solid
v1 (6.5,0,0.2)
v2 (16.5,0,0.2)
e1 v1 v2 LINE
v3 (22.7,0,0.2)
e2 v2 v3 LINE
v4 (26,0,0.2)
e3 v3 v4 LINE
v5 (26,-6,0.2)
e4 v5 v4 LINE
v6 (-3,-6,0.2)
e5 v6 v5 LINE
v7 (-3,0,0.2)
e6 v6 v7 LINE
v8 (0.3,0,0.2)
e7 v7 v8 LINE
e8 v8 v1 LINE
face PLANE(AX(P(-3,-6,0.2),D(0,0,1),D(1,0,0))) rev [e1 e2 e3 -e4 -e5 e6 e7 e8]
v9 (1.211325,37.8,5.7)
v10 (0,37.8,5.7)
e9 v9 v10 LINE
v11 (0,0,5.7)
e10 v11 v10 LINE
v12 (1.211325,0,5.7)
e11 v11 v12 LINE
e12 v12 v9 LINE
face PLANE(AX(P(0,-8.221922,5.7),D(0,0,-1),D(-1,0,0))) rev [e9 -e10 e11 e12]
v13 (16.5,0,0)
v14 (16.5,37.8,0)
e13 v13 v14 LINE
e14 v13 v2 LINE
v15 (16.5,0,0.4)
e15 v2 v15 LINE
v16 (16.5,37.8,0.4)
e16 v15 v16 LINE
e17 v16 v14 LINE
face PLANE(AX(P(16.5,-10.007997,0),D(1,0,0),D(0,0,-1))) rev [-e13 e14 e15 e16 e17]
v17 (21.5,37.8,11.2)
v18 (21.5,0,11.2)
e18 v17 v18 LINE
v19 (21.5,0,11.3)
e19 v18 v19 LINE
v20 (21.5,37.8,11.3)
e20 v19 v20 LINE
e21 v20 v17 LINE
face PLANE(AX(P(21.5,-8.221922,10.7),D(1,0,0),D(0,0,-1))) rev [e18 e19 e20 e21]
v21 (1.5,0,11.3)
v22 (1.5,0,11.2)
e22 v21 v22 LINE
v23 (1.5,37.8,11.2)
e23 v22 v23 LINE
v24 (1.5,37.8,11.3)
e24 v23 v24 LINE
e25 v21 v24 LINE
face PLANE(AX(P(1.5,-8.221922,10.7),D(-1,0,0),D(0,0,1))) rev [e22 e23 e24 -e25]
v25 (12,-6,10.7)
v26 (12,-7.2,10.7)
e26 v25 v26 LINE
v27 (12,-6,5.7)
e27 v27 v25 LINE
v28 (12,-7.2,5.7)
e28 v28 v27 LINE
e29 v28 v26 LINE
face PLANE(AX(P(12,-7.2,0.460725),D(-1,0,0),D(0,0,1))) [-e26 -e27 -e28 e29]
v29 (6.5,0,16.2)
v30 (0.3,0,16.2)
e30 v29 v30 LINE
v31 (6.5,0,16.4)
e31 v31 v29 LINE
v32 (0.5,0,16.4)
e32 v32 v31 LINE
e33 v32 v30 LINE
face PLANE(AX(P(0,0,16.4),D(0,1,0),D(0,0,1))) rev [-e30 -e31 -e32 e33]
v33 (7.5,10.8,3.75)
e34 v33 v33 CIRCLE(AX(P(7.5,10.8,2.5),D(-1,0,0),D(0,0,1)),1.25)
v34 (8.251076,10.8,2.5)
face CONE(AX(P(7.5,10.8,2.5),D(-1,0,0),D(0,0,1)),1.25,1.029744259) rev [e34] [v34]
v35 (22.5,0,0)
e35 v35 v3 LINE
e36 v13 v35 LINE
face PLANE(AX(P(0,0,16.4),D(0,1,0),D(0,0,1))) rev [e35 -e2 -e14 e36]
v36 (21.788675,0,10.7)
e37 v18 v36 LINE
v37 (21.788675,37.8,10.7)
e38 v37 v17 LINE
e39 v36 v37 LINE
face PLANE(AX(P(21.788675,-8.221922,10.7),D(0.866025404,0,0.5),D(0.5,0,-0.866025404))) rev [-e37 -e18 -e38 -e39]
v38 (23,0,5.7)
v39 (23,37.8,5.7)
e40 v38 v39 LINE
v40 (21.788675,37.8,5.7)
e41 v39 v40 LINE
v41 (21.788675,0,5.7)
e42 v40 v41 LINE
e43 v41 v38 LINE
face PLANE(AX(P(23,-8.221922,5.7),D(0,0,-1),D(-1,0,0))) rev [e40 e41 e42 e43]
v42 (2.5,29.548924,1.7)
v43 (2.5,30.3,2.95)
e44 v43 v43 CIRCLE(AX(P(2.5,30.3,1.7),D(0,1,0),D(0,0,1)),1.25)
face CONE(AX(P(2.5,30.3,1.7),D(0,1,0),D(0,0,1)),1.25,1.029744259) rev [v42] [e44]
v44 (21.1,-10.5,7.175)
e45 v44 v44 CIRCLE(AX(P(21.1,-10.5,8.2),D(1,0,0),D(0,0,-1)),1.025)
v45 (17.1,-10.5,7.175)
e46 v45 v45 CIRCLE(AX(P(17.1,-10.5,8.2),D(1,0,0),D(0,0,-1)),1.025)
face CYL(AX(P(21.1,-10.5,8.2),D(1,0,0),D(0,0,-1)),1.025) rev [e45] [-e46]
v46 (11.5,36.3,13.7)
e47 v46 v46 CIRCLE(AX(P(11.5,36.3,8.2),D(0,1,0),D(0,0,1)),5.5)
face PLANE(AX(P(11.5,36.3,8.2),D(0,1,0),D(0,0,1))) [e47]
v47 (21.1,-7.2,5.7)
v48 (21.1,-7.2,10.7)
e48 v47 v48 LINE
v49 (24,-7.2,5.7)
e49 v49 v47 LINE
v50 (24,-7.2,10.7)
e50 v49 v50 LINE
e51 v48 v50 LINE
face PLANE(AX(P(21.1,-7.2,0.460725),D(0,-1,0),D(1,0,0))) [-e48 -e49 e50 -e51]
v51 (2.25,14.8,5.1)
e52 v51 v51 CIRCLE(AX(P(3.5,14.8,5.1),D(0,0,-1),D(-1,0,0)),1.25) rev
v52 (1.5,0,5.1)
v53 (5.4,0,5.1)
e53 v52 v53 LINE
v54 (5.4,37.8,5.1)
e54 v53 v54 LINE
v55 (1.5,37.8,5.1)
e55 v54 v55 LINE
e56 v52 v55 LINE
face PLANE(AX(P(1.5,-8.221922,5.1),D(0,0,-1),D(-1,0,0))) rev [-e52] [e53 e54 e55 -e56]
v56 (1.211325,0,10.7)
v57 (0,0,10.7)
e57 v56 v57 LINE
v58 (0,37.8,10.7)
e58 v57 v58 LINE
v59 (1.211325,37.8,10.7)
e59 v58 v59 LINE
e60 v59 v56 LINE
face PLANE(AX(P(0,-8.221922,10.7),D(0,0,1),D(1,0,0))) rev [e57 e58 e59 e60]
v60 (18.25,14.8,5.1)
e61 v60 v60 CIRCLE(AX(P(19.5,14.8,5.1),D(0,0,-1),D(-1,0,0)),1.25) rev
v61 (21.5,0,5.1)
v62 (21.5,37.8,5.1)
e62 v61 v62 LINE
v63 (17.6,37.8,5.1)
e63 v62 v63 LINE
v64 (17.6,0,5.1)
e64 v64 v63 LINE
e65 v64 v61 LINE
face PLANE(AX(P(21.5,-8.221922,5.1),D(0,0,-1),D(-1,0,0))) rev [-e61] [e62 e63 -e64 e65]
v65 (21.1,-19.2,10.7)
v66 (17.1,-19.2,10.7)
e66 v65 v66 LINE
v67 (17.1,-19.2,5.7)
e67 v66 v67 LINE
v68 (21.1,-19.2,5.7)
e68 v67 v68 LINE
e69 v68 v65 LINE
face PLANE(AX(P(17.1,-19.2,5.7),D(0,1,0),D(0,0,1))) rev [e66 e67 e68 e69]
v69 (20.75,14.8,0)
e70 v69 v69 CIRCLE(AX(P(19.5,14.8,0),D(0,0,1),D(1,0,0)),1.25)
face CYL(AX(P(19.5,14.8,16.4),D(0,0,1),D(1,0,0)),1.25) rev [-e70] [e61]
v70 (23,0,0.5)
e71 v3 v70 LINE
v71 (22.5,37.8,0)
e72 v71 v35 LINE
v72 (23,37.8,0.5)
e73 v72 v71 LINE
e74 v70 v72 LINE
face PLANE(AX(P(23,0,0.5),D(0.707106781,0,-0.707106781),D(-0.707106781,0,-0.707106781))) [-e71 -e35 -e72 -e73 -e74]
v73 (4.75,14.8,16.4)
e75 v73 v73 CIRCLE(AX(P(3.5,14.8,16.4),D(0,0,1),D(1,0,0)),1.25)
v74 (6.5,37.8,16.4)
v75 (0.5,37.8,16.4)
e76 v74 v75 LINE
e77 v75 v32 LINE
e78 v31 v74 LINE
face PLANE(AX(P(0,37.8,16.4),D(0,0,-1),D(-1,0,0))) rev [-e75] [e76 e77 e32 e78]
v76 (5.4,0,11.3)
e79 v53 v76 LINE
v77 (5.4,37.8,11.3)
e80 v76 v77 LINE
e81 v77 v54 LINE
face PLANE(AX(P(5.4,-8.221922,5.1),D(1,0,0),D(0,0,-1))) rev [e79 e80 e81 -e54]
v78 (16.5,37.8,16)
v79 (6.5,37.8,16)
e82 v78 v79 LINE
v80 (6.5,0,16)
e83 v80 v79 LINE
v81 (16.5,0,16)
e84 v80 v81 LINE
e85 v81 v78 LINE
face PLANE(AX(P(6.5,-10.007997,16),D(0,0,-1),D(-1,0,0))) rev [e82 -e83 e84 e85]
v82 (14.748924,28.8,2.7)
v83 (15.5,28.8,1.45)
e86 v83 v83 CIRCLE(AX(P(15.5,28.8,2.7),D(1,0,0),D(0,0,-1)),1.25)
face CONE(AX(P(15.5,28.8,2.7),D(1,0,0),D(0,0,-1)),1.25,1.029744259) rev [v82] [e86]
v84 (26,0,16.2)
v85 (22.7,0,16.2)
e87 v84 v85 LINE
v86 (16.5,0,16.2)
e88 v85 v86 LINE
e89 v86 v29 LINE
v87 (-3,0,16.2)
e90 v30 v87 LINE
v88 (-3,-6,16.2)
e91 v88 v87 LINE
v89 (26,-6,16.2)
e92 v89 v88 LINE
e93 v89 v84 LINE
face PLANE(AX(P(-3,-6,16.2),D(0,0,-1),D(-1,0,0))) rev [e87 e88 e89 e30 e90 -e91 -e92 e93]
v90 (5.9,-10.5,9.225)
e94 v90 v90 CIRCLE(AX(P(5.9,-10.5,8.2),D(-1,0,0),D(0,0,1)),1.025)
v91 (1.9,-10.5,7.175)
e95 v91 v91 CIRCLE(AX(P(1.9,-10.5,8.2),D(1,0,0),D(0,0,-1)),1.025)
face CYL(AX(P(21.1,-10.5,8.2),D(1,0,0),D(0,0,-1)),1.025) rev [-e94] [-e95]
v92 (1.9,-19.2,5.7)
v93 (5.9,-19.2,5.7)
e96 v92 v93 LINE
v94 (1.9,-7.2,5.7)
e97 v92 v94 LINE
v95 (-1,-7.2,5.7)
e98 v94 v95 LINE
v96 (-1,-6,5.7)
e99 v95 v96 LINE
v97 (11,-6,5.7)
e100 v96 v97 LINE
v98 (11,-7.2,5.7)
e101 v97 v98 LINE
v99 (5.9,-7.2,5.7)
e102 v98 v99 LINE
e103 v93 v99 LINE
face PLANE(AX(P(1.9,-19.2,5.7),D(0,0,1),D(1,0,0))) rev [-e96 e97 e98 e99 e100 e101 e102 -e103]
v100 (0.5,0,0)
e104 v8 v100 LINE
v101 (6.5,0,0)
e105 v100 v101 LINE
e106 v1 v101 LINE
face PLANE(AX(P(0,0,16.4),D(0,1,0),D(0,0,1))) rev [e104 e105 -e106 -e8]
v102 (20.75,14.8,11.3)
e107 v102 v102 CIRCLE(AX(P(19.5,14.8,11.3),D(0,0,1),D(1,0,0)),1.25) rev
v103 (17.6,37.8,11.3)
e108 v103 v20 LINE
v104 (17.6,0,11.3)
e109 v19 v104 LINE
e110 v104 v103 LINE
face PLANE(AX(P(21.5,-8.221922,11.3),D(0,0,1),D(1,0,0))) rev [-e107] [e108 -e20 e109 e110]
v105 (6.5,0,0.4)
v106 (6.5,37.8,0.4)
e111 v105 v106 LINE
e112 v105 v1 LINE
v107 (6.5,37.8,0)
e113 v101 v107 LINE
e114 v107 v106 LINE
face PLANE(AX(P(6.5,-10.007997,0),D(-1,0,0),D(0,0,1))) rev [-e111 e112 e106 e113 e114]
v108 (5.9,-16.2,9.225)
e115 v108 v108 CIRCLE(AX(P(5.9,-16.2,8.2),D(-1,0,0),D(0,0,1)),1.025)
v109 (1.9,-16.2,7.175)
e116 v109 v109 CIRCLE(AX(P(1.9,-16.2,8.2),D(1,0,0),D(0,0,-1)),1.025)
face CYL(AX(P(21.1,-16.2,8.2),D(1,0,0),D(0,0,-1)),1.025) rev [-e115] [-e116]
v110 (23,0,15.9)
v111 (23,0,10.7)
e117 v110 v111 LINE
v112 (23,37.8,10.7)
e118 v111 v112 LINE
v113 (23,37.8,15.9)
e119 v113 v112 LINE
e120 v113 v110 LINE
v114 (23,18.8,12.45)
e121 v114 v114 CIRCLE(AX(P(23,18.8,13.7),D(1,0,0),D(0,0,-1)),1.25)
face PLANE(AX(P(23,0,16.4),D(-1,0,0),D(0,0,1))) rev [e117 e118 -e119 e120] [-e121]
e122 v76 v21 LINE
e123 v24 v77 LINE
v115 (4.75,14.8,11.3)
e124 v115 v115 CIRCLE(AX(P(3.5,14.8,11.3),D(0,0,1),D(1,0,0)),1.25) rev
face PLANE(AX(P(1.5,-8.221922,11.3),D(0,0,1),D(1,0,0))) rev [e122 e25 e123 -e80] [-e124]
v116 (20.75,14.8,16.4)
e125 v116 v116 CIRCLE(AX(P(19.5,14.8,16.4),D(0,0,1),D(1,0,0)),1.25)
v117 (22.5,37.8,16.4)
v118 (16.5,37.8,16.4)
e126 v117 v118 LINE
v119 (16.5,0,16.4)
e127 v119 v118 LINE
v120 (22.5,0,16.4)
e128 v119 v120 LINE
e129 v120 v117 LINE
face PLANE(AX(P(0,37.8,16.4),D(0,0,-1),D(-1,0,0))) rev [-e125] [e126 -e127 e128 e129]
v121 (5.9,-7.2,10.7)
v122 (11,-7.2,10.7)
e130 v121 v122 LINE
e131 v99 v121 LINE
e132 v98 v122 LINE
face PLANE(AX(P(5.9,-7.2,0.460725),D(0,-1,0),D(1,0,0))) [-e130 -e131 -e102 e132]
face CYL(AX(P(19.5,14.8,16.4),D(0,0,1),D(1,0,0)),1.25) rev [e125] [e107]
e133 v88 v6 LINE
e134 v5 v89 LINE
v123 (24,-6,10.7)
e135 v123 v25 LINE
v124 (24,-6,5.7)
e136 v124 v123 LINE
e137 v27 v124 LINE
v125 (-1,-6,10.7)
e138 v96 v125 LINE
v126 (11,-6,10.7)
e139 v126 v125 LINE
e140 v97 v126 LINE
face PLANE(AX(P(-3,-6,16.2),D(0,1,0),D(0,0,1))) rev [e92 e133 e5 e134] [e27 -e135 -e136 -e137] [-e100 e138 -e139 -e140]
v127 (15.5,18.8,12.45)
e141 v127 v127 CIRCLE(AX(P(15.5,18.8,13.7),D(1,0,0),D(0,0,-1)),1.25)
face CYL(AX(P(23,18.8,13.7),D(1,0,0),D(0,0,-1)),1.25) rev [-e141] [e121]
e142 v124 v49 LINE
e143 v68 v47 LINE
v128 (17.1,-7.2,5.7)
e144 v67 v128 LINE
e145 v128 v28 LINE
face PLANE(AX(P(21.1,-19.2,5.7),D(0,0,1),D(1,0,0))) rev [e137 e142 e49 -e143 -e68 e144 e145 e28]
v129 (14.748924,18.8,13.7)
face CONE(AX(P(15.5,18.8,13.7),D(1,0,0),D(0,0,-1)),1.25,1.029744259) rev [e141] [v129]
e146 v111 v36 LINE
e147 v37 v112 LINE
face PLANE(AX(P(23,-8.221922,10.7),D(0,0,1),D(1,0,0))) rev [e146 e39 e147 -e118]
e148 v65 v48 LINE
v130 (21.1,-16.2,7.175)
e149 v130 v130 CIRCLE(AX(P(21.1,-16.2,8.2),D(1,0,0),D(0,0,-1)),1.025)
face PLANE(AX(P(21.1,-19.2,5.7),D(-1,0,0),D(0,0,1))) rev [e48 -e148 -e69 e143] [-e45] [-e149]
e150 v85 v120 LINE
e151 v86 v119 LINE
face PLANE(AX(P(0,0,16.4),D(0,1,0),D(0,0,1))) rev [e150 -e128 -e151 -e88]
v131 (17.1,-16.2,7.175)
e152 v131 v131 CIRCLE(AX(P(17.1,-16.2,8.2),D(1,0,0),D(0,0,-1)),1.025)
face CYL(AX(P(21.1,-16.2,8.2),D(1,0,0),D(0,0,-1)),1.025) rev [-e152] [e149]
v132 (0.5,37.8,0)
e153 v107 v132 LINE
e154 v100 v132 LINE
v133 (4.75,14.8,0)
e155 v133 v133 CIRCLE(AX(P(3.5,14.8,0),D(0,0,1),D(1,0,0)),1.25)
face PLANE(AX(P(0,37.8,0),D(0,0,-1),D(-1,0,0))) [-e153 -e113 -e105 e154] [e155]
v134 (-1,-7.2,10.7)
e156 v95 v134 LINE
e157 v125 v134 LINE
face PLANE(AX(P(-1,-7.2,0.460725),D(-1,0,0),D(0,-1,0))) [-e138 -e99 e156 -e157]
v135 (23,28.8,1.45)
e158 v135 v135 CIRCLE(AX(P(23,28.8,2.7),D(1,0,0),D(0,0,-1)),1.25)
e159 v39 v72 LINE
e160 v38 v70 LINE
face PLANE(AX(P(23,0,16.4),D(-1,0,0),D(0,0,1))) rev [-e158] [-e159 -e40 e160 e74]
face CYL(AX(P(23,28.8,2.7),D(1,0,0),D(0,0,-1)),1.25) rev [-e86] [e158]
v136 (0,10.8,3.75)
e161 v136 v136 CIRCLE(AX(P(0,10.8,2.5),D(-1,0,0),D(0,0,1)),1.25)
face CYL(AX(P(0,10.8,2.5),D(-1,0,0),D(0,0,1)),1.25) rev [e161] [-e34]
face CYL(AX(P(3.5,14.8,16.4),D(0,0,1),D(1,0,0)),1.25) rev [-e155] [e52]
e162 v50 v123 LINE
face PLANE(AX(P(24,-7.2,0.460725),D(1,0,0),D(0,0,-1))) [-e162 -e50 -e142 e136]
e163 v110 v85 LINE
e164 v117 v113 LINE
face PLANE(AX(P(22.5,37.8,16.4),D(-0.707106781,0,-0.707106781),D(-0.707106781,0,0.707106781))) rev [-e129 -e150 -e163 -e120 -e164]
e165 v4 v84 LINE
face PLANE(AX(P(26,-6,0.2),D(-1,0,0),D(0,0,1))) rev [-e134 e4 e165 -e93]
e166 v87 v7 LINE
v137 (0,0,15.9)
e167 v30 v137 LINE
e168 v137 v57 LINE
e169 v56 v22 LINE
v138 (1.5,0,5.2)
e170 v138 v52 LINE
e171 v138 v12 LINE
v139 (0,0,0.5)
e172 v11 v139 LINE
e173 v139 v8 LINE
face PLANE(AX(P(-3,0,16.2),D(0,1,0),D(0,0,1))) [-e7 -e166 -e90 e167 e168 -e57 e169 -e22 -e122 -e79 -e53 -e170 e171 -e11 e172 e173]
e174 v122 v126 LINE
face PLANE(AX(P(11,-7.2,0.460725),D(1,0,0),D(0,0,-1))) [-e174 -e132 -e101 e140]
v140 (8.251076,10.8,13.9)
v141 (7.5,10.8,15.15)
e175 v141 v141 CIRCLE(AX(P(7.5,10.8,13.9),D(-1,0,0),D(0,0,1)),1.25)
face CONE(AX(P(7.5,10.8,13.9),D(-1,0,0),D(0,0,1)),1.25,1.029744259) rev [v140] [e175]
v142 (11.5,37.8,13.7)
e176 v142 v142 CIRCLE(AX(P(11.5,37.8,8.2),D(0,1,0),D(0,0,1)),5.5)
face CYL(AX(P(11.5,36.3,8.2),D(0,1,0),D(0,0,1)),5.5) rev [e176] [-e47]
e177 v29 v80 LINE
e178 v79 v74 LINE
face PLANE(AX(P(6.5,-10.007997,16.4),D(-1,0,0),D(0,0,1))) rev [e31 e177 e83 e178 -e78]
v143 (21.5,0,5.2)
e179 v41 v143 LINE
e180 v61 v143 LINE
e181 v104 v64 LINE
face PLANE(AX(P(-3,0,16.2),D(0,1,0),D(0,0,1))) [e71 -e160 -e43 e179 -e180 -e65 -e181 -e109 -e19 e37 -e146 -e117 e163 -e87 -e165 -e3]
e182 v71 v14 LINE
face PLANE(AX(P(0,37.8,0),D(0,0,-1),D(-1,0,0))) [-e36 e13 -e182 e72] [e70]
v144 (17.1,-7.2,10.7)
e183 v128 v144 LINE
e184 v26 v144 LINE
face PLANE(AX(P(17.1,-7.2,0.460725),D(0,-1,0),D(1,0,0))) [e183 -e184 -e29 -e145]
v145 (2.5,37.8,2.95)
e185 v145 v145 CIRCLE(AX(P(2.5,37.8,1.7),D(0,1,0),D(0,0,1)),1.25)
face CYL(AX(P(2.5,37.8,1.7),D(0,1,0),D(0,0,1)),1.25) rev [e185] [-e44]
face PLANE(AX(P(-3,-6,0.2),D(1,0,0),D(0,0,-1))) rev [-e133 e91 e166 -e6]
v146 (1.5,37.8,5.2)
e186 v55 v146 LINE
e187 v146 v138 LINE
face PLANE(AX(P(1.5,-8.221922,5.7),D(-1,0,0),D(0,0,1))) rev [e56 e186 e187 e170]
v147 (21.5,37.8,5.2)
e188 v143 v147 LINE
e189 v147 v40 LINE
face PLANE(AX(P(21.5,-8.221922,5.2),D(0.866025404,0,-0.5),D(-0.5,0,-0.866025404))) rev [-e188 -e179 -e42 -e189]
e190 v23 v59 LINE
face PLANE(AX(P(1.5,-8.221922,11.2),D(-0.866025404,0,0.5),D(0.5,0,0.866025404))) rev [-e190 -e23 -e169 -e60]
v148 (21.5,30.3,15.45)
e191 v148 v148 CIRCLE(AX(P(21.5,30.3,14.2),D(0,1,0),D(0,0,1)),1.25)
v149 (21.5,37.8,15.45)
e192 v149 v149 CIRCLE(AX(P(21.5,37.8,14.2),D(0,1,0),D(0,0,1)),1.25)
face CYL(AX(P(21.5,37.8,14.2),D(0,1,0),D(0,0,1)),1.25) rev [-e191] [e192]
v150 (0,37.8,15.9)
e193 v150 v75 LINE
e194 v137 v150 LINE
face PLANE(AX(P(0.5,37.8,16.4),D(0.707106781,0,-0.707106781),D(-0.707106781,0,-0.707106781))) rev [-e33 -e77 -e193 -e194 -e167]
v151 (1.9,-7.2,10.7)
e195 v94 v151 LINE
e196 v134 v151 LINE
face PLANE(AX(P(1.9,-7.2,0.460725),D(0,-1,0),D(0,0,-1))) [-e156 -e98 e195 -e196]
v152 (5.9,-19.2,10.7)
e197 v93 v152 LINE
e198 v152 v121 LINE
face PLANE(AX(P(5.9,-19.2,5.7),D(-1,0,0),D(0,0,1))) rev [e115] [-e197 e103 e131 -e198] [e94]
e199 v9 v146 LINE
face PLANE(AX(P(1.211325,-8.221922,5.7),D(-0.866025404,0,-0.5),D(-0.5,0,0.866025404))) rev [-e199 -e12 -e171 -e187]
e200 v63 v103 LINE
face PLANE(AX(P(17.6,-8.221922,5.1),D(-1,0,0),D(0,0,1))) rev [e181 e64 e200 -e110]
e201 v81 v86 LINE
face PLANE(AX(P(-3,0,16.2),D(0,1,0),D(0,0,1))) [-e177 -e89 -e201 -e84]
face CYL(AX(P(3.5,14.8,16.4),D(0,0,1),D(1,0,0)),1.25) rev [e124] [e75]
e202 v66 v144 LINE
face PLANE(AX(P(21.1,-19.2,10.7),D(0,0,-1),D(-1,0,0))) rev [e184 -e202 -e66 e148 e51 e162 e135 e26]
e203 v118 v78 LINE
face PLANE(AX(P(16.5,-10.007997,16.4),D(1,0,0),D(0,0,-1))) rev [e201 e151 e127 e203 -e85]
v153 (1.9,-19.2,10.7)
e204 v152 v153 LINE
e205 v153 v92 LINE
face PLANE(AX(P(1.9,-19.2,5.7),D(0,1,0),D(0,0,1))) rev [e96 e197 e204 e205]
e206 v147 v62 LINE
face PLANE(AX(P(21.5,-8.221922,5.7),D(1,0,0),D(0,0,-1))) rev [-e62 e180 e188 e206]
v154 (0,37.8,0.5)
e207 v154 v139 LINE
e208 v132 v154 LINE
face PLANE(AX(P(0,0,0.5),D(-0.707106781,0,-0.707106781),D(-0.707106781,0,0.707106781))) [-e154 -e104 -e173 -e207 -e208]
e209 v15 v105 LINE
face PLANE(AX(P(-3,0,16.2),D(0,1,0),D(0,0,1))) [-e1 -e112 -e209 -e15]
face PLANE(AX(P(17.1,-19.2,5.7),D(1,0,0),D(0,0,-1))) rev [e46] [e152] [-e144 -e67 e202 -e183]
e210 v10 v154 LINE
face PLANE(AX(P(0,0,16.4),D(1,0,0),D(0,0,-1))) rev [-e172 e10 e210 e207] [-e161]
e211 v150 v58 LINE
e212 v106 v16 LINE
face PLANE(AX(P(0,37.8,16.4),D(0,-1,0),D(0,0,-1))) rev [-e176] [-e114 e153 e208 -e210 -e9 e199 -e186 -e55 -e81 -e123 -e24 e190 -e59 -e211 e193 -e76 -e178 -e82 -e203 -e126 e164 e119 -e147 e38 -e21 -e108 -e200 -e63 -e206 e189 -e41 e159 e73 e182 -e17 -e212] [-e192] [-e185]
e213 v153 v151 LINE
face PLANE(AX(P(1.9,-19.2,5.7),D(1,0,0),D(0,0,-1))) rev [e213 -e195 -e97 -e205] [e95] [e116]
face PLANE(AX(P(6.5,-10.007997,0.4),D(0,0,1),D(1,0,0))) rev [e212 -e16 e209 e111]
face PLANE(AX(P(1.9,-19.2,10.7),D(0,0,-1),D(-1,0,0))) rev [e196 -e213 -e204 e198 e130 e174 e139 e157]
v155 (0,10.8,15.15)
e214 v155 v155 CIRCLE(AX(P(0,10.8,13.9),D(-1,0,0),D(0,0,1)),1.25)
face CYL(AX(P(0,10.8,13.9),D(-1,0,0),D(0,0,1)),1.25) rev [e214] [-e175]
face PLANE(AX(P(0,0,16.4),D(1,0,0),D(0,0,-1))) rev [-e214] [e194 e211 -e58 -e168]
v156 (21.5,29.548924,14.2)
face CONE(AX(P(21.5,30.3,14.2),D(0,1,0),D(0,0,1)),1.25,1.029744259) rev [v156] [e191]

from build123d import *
from OCP.BRepFilletAPI import BRepFilletAPI_MakeChamfer

# Parameters (mm, degrees)
SKETCH_1_W             = 23
SKETCH_1_H             = 37.8
EXTRUDE_1_DEPTH        = 16.4
SKETCH_19_W            = 29
SKETCH_19_H            = 16
EXTRUDE_3_DEPTH        = 6
SKETCH_5_W             = 4
SKETCH_5_H             = 5
EXTRUDE_2_DEPTH        = 13.2
SKETCH_20_W            = 2.9
SKETCH_20_H            = 1.2
SKETCH_20_W_2          = 5.1
EXTRUDE_4_DEPTH        = 5
HOLE_WIZARD_M2_5_1_D   = 2.05
HOLE_WIZARD_M3_6_D     = 2.5
HOLE_WIZARD_M3_6_DEPTH = 7.5
HOLE_WIZARD_M3_6_TIP   = 0.751075774
HOLE_WIZARD_M3_7_D     = 2.5
HOLE_WIZARD_M3_7_DEPTH = 7.5
HOLE_WIZARD_M3_7_TIP   = 0.751075774
HOLE_WIZARD_M3_5_D     = 2.5
SKETCH_15_R            = 5.5
CUT_EXTRUDE_4_DEPTH    = 1.5
HOLE_WIZARD_M3_4_D     = 2.5
HOLE_WIZARD_M3_4_DEPTH = 7.5
HOLE_WIZARD_M3_4_TIP   = 0.751075774
CUT_EXTRUDE_5_REACH    = 66.761
CHAMFER_1_SIZE         = 0.5
CHAMFER_1_SIZE2        = 0.288675135
CHAMFER_2_SIZE         = 0.5
CHAMFER_2_SIZE2        = 0.288675135
SKETCH_25_W            = 10
SKETCH_25_H            = 0.4
CUT_EXTRUDE_6_DEPTH    = 37.8
CHAMFER_3_SIZE         = 0.5


with BuildPart() as part:
    # 草图1 → 拉伸1 (new body)
    with BuildSketch(Plane.XY):
        with Locations((11.5, 18.9)):
            Rectangle(SKETCH_1_W, SKETCH_1_H)
    extrude(amount=EXTRUDE_1_DEPTH)

    # 草图19 → 拉伸3 (add)
    with BuildSketch(Plane.XZ):
        with Locations((11.5, 8.2)):
            Rectangle(SKETCH_19_W, SKETCH_19_H)
    extrude(amount=EXTRUDE_3_DEPTH)

    # 草图5 → 拉伸2 (add)
    with BuildSketch(Plane.XZ.offset(6)):
        with Locations((3.9, 8.2)):
            Rectangle(SKETCH_5_W, SKETCH_5_H)
        with Locations((19.1, 8.2)):
            Rectangle(SKETCH_5_W, SKETCH_5_H)
    extrude(amount=EXTRUDE_2_DEPTH)

    # 草图20 → 拉伸4 (add)
    with BuildSketch(Plane.XY.offset(10.7)):
        with Locations((0.45, -6.6)):
            Rectangle(SKETCH_20_W, SKETCH_20_H)
        with Locations((8.45, -6.6)):
            Rectangle(SKETCH_20_W_2, SKETCH_20_H)
        with Locations((14.55, -6.6)):
            Rectangle(SKETCH_20_W_2, SKETCH_20_H)
        with Locations((22.55, -6.6)):
            Rectangle(SKETCH_20_W, SKETCH_20_H)
    extrude(amount=-EXTRUDE_4_DEPTH)

    # M2.5 螺纹孔1 (through all)
    with Locations(Plane(origin=(21.1, 0, 0), x_dir=(0, 0, -1), z_dir=(1, 0, 0))):
        with Locations((-8.2, -16.2), (-8.2, -10.5)):
            Hole(HOLE_WIZARD_M2_5_1_D / 2)

    # M3 螺纹孔6
    with Locations(Plane(origin=(23, 0, 0), x_dir=(0, 0, -1), z_dir=(1, 0, 0))):
        with Locations((-2.7, 28.8), (-13.7, 18.8)):
            Hole(HOLE_WIZARD_M3_6_D / 2, depth=HOLE_WIZARD_M3_6_DEPTH)
            with Locations((0, 0, -(HOLE_WIZARD_M3_6_DEPTH + HOLE_WIZARD_M3_6_TIP / 2))):  # 118° drill point
                Cone(0, HOLE_WIZARD_M3_6_D / 2, HOLE_WIZARD_M3_6_TIP, mode=Mode.SUBTRACT)

    # M3 螺纹孔7
    with Locations(Plane.ZY):
        with Locations((2.5, 10.8), (13.9, 10.8)):
            Hole(HOLE_WIZARD_M3_7_D / 2, depth=HOLE_WIZARD_M3_7_DEPTH)
            with Locations((0, 0, -(HOLE_WIZARD_M3_7_DEPTH + HOLE_WIZARD_M3_7_TIP / 2))):  # 118° drill point
                Cone(0, HOLE_WIZARD_M3_7_D / 2, HOLE_WIZARD_M3_7_TIP, mode=Mode.SUBTRACT)

    # M3 螺纹孔5 (through all)
    with Locations(Plane.XY.offset(16.4)):
        with Locations((3.5, 14.8), (19.5, 14.8)):
            Hole(HOLE_WIZARD_M3_5_D / 2)

    # 草图15 → 切除-拉伸4 (cut)
    with BuildSketch(Plane(origin=(0, 37.8, 0), x_dir=(1, 0, 0), z_dir=(0, 1, 0))):
        with Locations(Location((11.5, -8.2, 0), (0, 0, 270))):
            Circle(SKETCH_15_R)
    extrude(amount=-CUT_EXTRUDE_4_DEPTH, mode=Mode.SUBTRACT)

    # M3 螺纹孔4
    with Locations(Plane(origin=(0, 37.8, 0), x_dir=(-1, 0, 0), z_dir=(0, 1, 0))):
        with Locations((-2.5, 1.7), (-21.5, 14.2)):
            Hole(HOLE_WIZARD_M3_4_D / 2, depth=HOLE_WIZARD_M3_4_DEPTH)
            with Locations((0, 0, -(HOLE_WIZARD_M3_4_DEPTH + HOLE_WIZARD_M3_4_TIP / 2))):  # 118° drill point
                Cone(0, HOLE_WIZARD_M3_4_D / 2, HOLE_WIZARD_M3_4_TIP, mode=Mode.SUBTRACT)

    # 切除-拉伸5: up to this face of the body (flat: up to its plane)
    cut_extrude_5_end = Plane(part.part.faces().sort_by_distance((-1.5, 0, 8.2))[0])
    # 草图18 → 切除-拉伸5 (cut, up to the picked face)
    with BuildSketch(Plane(origin=(0, 37.8, 0), x_dir=(1, 0, 0), z_dir=(0, 1, 0)), mode=Mode.PRIVATE) as cut_extrude_5_sk1:
        Polygon((23, -10.7), (23, -5.7), (21.5, -5.7), (21.5, -5.1), (17.6, -5.1), (17.6, -11.3), (21.5, -11.3), (21.5, -10.7), align=None)
    cut_extrude_5_tool1 = split(extrude(cut_extrude_5_sk1.sketch, amount=-CUT_EXTRUDE_5_REACH, mode=Mode.PRIVATE), bisect_by=cut_extrude_5_end, keep=Keep.BOTH, mode=Mode.PRIVATE)
    # 草图18 → 切除-拉伸5 (cut, up to the picked face)
    with BuildSketch(Plane(origin=(0, 37.8, 0), x_dir=(1, 0, 0), z_dir=(0, 1, 0)), mode=Mode.PRIVATE) as cut_extrude_5_sk2:
        Polygon((0, -10.7), (1.5, -10.7), (1.5, -11.3), (5.4, -11.3), (5.4, -5.1), (1.5, -5.1), (1.5, -5.7), (0, -5.7), align=None)
    cut_extrude_5_tool2 = split(extrude(cut_extrude_5_sk2.sketch, amount=-CUT_EXTRUDE_5_REACH, mode=Mode.PRIVATE), bisect_by=cut_extrude_5_end, keep=Keep.BOTH, mode=Mode.PRIVATE)
    add(cut_extrude_5_tool1.solids().sort_by(Axis((20.189205, 37.8, 8.2), (0, -1, 0)))[0], mode=Mode.SUBTRACT)
    add(cut_extrude_5_tool2.solids().sort_by(Axis((2.810795, 37.8, 8.2), (0, -1, 0)))[0], mode=Mode.SUBTRACT)

    # 倒角1: one chamfer whose edges measure the first distance from different faces: ONE call of the kernel's chamfer builder (chamfer() names one face for all edges)
    chamfer_1_edges_1 = [part.edges().sort_by_distance(p)[0] for p in [
        (21.5, 18.9, 10.7),
    ]]
    chamfer_1_side_1 = [part.faces().sort_by_distance(p)[0] for p in [
        (21.5, 18.9, 11),
    ]]
    chamfer_1_edges_2 = [part.edges().sort_by_distance(p)[0] for p in [
        (1.5, 18.9, 5.7),
    ]]
    chamfer_1_side_2 = [part.faces().sort_by_distance(p)[0] for p in [
        (1.5, 18.9, 5.4),
    ]]
    chamfer_1 = BRepFilletAPI_MakeChamfer(part.part.solid().wrapped)
    for e in chamfer_1_edges_1:
        chamfer_1.Add(CHAMFER_1_SIZE, CHAMFER_1_SIZE2, e.wrapped, chamfer_1_side_1[0].wrapped)  # the first distance lies on this face
    for e in chamfer_1_edges_2:
        chamfer_1.Add(CHAMFER_1_SIZE, CHAMFER_1_SIZE2, e.wrapped, chamfer_1_side_2[0].wrapped)  # the first distance lies on this face
    add(Compound.cast(chamfer_1.Shape()), mode=Mode.REPLACE)

    # 倒角2: one chamfer whose edges measure the first distance from different faces: ONE call of the kernel's chamfer builder (chamfer() names one face for all edges)
    chamfer_2_edges_1 = [part.edges().sort_by_distance(p)[0] for p in [
        (21.5, 18.9, 5.7),
    ]]
    chamfer_2_side_1 = [part.faces().sort_by_distance(p)[0] for p in [
        (21.5, 18.9, 5.4),
    ]]
    chamfer_2_edges_2 = [part.edges().sort_by_distance(p)[0] for p in [
        (1.5, 18.9, 10.7),
    ]]
    chamfer_2_side_2 = [part.faces().sort_by_distance(p)[0] for p in [
        (1.5, 18.9, 11),
    ]]
    chamfer_2 = BRepFilletAPI_MakeChamfer(part.part.solid().wrapped)
    for e in chamfer_2_edges_1:
        chamfer_2.Add(CHAMFER_2_SIZE, CHAMFER_2_SIZE2, e.wrapped, chamfer_2_side_1[0].wrapped)  # the first distance lies on this face
    for e in chamfer_2_edges_2:
        chamfer_2.Add(CHAMFER_2_SIZE, CHAMFER_2_SIZE2, e.wrapped, chamfer_2_side_2[0].wrapped)  # the first distance lies on this face
    add(Compound.cast(chamfer_2.Shape()), mode=Mode.REPLACE)

    # 草图25 → 切除-拉伸6 (cut)
    with BuildSketch(Plane(origin=(0, 37.8, 0), x_dir=(1, 0, 0), z_dir=(0, 1, 0))):
        with Locations((11.5, -0.2)):
            Rectangle(SKETCH_25_W, SKETCH_25_H)
        with Locations((11.5, -16.2)):
            Rectangle(SKETCH_25_W, SKETCH_25_H)
    extrude(amount=-CUT_EXTRUDE_6_DEPTH, mode=Mode.SUBTRACT)

    # 倒角3
    # the kernel refuses this chamfer: 0.5 mm, written as the material it takes off along each edge
    with BuildSketch(Plane(origin=(23, 0, 16.4), x_dir=(-0.9996219169112968, 0, 0.027495876610589005), z_dir=(0, 1, 0)), Plane(origin=(23, 0, 0), x_dir=(0.02749587661058908, 0, 0.9996219169112968), z_dir=(0, 1, 0))) as chamfer_3_piece_1:
        Polygon((CHAMFER_3_SIZE * 0.999621916911, -CHAMFER_3_SIZE * 0.0274958766106), (-CHAMFER_3_SIZE * 0.0274958766106, -CHAMFER_3_SIZE * 0.999621916911), (0, 0), align=None)
    extrude(amount=39.085841494, mode=Mode.SUBTRACT)
    with BuildSketch(Plane(origin=(0, 39.085841494, 16.4), x_dir=(-0.02749587661058639, 0, -0.9996219169112968), z_dir=(0, -1, 0)), Plane(origin=(0, 39.085841494, 0), x_dir=(0.9996219169112968, 0, -0.027495876610586372), z_dir=(0, -1, 0))) as chamfer_3_piece_2:
        Polygon((CHAMFER_3_SIZE * 0.999621916911, CHAMFER_3_SIZE * 0.0274958766106), (-CHAMFER_3_SIZE * 0.0274958766106, CHAMFER_3_SIZE * 0.999621916911), (0, 0), align=None)
    extrude(amount=39.085841494, mode=Mode.SUBTRACT)


solid = part.part
